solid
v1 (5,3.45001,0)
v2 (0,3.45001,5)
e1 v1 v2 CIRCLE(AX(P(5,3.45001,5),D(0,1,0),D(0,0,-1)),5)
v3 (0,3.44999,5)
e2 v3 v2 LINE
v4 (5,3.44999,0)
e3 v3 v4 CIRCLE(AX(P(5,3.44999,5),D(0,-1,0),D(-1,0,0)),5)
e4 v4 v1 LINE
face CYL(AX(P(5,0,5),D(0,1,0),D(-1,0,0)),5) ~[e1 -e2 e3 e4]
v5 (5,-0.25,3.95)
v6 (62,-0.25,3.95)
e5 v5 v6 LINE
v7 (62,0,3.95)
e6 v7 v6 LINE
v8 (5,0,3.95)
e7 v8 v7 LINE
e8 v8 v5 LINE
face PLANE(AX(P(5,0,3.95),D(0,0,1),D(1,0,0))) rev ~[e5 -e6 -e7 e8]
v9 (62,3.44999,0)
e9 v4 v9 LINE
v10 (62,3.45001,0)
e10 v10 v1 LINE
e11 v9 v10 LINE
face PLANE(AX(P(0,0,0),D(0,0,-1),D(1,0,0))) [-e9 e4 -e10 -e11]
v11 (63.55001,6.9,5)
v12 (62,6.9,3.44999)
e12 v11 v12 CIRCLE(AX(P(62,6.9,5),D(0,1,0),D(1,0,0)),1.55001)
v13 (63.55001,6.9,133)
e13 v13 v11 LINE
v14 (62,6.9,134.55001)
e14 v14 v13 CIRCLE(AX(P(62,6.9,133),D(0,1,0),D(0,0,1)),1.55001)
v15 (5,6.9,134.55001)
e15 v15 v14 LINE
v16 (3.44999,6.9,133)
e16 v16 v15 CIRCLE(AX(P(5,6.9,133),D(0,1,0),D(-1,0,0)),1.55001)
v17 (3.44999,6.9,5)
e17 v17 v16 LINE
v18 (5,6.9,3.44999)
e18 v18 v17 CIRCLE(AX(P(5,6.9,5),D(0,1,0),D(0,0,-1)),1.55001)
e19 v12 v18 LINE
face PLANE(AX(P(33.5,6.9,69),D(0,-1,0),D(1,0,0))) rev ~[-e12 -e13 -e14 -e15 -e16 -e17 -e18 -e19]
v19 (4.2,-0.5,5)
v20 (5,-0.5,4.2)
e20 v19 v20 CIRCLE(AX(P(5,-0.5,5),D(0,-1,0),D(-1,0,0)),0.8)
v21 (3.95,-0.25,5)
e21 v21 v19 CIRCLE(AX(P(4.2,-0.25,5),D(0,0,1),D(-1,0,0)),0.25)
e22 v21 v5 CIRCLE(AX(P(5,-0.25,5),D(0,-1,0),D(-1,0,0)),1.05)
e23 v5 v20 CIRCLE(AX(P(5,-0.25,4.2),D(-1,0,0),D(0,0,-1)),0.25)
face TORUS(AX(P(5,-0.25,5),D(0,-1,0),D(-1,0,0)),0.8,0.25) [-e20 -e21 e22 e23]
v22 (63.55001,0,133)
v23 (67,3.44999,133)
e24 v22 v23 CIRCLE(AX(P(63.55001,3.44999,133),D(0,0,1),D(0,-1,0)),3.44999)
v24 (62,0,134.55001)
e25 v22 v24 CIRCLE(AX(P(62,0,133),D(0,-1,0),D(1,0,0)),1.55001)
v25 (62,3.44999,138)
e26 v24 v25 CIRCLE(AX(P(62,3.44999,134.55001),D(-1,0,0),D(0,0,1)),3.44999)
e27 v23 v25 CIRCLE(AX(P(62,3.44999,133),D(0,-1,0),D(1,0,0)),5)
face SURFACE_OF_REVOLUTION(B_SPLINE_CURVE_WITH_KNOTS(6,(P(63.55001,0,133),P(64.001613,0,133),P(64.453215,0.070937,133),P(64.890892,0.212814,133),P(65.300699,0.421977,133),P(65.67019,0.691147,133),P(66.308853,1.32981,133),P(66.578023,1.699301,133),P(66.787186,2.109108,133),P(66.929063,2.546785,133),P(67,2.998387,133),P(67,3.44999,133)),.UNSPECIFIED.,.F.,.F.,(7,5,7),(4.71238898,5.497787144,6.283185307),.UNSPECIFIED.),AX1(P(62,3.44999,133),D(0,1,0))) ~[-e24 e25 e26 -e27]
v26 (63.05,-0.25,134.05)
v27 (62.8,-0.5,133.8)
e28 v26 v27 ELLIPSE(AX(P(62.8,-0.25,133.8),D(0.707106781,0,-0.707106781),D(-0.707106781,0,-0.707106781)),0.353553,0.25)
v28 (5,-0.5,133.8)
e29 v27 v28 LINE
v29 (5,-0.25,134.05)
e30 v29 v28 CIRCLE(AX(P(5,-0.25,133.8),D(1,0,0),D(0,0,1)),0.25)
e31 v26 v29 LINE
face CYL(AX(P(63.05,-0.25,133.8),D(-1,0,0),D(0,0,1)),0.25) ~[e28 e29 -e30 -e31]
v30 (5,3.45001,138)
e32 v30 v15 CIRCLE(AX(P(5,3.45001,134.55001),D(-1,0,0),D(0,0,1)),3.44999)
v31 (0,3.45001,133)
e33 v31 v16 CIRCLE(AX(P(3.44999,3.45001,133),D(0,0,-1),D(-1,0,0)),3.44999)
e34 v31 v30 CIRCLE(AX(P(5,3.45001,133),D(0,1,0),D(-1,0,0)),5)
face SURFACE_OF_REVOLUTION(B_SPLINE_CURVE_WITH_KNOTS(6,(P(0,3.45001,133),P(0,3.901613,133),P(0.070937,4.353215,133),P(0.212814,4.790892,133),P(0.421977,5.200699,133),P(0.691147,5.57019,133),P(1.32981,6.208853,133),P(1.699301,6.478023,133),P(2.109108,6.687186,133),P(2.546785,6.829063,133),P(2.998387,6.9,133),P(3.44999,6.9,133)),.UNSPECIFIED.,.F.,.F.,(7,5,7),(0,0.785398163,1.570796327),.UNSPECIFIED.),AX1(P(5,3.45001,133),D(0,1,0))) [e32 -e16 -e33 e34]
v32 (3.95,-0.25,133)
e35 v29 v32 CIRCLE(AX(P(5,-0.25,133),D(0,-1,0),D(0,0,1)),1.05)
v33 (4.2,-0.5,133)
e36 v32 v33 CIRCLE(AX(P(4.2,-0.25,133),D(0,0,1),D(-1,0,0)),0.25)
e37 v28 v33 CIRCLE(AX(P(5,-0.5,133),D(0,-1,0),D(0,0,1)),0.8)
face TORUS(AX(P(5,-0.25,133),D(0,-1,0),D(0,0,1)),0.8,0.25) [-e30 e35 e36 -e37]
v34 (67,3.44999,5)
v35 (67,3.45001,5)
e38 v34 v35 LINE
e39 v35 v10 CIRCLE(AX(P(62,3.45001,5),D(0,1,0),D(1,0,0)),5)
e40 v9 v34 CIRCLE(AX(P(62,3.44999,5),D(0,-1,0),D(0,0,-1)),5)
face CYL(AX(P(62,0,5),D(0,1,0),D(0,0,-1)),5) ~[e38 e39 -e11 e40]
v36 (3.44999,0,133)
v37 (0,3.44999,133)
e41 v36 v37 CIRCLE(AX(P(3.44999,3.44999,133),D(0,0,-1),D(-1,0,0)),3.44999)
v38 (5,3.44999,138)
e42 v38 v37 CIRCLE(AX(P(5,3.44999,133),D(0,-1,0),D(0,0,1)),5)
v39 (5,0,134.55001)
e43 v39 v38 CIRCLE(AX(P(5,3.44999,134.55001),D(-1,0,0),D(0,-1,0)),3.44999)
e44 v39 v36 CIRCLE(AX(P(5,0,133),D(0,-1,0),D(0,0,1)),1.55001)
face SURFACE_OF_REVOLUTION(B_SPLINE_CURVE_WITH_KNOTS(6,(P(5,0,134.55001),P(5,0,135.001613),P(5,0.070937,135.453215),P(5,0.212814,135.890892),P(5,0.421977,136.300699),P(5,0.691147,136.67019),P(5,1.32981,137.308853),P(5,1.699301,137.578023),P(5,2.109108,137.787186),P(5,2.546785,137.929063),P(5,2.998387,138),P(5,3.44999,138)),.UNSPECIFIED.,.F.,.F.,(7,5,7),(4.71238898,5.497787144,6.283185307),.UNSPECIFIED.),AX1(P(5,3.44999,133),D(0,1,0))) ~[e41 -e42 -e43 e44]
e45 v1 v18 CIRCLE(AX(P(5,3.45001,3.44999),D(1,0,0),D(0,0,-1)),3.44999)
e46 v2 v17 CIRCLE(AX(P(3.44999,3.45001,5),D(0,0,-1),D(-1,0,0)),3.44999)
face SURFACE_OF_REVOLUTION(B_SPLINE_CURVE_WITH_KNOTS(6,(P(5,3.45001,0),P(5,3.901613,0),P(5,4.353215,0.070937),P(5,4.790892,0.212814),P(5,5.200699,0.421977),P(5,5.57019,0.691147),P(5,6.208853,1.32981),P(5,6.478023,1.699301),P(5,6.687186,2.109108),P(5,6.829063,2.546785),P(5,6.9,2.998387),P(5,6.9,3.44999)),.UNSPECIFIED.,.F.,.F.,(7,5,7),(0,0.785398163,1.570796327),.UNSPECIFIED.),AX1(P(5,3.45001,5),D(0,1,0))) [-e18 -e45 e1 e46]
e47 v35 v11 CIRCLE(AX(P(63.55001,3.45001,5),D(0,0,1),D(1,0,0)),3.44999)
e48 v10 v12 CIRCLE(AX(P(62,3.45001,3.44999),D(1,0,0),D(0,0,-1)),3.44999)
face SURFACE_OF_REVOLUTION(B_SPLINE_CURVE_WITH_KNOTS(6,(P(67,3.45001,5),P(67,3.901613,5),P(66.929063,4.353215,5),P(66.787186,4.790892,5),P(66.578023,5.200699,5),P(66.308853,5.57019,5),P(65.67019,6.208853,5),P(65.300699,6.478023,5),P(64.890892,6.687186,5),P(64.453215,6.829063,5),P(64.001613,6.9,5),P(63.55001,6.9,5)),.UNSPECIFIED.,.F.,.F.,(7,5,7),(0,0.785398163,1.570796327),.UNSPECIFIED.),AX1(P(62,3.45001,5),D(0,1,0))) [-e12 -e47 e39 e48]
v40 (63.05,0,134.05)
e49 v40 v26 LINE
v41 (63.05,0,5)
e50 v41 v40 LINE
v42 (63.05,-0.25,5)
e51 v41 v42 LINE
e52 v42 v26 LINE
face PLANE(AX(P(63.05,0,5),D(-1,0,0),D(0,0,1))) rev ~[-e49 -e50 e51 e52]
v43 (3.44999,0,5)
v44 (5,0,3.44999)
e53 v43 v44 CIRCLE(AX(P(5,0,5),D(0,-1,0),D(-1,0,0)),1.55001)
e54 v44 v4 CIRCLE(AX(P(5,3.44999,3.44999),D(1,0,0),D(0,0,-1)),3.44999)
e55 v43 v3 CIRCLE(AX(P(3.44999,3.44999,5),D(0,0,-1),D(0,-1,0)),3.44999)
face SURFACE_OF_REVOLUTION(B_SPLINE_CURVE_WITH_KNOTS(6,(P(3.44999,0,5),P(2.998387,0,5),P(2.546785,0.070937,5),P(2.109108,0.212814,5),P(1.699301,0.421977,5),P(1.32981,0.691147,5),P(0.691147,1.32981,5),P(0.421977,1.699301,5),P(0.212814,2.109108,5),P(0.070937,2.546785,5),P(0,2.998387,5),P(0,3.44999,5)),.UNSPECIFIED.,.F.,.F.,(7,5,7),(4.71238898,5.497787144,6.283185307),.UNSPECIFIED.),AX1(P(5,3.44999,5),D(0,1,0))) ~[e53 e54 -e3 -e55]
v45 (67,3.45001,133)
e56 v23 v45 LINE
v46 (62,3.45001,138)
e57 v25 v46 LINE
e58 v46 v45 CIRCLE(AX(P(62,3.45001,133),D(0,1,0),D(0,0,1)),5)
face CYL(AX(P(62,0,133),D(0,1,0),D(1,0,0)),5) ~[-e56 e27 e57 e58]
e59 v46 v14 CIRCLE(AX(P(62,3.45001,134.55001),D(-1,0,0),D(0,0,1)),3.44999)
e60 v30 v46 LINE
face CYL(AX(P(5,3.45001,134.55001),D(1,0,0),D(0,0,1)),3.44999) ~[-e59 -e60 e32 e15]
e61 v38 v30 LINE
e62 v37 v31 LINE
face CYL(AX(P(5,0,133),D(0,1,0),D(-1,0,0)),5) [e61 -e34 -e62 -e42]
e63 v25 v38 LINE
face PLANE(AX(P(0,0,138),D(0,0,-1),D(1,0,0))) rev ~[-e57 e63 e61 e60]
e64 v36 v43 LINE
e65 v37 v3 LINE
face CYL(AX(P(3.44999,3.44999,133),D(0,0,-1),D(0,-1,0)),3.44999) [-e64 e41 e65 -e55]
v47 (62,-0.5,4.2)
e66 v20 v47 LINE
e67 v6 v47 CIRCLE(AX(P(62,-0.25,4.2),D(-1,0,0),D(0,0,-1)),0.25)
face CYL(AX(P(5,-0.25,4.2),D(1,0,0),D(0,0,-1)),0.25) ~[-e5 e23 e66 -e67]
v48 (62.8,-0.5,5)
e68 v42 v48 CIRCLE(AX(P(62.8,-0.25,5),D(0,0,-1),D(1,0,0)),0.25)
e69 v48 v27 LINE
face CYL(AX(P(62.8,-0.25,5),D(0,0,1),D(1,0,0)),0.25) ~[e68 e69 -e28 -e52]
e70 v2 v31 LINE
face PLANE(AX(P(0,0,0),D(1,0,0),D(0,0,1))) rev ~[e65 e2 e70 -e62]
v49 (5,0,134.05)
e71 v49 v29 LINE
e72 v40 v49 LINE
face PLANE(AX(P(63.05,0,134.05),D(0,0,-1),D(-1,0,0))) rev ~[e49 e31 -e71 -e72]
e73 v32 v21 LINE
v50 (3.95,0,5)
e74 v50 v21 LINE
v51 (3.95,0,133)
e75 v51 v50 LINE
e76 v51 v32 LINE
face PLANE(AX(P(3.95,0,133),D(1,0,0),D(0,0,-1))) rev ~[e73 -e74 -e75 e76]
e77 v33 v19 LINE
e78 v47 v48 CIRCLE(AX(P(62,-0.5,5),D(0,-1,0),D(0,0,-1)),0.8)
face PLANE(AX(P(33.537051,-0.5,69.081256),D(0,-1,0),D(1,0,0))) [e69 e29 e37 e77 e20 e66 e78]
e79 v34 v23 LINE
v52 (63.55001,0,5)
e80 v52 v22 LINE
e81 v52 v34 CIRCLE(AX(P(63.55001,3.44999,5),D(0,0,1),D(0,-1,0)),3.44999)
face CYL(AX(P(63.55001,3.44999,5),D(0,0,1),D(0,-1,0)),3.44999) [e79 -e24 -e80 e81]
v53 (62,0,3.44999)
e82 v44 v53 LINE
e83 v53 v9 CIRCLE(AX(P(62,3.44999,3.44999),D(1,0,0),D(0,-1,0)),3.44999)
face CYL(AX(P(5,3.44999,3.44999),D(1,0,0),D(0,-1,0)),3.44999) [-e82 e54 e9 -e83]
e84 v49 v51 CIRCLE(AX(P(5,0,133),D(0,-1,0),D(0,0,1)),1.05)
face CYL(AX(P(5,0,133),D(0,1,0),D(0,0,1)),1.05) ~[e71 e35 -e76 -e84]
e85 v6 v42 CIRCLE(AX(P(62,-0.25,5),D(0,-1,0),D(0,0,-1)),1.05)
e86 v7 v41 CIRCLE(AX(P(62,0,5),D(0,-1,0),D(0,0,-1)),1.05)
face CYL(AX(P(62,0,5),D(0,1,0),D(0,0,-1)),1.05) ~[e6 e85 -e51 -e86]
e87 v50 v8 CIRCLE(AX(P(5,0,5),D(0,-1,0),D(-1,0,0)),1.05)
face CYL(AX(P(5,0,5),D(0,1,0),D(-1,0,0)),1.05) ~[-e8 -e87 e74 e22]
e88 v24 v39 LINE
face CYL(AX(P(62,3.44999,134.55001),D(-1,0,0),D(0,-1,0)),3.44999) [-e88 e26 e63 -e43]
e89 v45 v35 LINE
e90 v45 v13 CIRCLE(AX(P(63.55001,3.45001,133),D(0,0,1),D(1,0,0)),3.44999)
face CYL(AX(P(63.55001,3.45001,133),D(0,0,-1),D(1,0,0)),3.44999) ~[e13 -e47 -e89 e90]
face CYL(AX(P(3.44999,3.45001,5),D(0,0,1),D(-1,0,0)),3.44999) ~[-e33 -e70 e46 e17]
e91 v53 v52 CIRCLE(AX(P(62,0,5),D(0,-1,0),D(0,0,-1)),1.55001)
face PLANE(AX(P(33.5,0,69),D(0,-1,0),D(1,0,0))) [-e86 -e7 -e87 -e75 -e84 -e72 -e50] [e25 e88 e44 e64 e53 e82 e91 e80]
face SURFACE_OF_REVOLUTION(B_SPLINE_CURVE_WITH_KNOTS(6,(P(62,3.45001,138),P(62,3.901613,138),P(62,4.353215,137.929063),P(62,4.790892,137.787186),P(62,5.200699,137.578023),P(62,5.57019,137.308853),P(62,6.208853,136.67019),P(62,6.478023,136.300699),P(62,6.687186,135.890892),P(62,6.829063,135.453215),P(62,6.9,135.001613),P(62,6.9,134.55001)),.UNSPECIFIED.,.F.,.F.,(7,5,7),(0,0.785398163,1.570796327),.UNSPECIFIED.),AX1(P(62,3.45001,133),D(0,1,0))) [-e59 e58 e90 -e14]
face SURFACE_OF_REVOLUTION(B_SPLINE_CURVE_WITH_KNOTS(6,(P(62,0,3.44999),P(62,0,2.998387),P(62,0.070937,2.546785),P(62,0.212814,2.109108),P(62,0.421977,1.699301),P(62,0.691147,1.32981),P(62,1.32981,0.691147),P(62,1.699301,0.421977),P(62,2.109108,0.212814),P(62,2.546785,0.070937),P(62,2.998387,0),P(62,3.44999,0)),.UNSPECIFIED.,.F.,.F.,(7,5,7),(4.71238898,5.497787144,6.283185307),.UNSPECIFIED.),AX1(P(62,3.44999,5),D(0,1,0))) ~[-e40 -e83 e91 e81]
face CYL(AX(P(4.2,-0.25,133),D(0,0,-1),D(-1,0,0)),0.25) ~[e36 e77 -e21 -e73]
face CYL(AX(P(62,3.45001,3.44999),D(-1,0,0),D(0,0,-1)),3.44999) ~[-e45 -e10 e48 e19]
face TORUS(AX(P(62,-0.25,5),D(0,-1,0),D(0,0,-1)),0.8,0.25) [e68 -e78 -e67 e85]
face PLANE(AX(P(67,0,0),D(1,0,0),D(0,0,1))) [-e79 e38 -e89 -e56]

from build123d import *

# Parameters (mm, degrees)
F0_W     = 67
F0_H     = 138
F1_DEPTH = 6.9
F2_R     = 5
F3_R     = 3.44999
F6_DEPTH = 0.5
F7_R     = 0.25


# Not quite as in the source:
# - a fillet or chamfer is up to 0.001 mm smaller than in the source, because OpenCascade refuses the exact size


with BuildPart() as f1:
    # F0 (on Front) → F1 (new body)
    with BuildSketch(Plane.XZ):
        with Locations((33.5, 69)):
            Rectangle(F0_W, F0_H)
    extrude(amount=-F1_DEPTH)

    # F2
    f2_edges = [f1.edges().sort_by_distance(p)[0] for p in [
        (67, 3.45, 138),
        (67, 3.45, 0),
        (0, 3.45, 138),
        (0, 3.45, 0),
    ]]
    fillet(f2_edges, radius=F2_R)

    # F3 (radius 3.45 in the source; OpenCascade refuses exactly that, so slightly less here)
    f3_edges = [f1.edges().sort_by_distance(p)[0] for p in [
        (67, 0, 69),
        (0, 6.9, 69),
        (1.464466, 6.9, 136.535534),
        (1.464466, 6.9, 1.464466),
        (33.5, 6.9, 138),
        (33.5, 6.9, 0),
        (65.535534, 6.9, 136.535534),
        (65.535534, 6.9, 1.464466),
        (67, 6.9, 69),
    ]]
    fillet(f3_edges, radius=F3_R)

    # F5 (on face) → F6 (join)
    with BuildSketch(Plane.XZ):
        with BuildLine():
            ThreePointArc((5, 134.05), (4.2575378798, 133.7424621202), (3.95, 133))
            Line((3.95, 133), (3.95, 5))
            ThreePointArc((3.95, 5), (4.2575378798, 4.2575378798), (5, 3.95))
            Line((5, 3.95), (62, 3.95))
            ThreePointArc((62, 3.95), (62.7424621202, 4.2575378798), (63.05, 5))
            Line((63.05, 5), (63.05, 134.05))
            Line((63.05, 134.05), (5, 134.05))
        make_face()
    extrude(amount=F6_DEPTH)

    # F7
    f7_edges = [f1.edges().sort_by_distance(p)[0] for p in [
        (3.95, -0.5, 69),
    ]]
    fillet(f7_edges, radius=F7_R)


solid = f1.part
